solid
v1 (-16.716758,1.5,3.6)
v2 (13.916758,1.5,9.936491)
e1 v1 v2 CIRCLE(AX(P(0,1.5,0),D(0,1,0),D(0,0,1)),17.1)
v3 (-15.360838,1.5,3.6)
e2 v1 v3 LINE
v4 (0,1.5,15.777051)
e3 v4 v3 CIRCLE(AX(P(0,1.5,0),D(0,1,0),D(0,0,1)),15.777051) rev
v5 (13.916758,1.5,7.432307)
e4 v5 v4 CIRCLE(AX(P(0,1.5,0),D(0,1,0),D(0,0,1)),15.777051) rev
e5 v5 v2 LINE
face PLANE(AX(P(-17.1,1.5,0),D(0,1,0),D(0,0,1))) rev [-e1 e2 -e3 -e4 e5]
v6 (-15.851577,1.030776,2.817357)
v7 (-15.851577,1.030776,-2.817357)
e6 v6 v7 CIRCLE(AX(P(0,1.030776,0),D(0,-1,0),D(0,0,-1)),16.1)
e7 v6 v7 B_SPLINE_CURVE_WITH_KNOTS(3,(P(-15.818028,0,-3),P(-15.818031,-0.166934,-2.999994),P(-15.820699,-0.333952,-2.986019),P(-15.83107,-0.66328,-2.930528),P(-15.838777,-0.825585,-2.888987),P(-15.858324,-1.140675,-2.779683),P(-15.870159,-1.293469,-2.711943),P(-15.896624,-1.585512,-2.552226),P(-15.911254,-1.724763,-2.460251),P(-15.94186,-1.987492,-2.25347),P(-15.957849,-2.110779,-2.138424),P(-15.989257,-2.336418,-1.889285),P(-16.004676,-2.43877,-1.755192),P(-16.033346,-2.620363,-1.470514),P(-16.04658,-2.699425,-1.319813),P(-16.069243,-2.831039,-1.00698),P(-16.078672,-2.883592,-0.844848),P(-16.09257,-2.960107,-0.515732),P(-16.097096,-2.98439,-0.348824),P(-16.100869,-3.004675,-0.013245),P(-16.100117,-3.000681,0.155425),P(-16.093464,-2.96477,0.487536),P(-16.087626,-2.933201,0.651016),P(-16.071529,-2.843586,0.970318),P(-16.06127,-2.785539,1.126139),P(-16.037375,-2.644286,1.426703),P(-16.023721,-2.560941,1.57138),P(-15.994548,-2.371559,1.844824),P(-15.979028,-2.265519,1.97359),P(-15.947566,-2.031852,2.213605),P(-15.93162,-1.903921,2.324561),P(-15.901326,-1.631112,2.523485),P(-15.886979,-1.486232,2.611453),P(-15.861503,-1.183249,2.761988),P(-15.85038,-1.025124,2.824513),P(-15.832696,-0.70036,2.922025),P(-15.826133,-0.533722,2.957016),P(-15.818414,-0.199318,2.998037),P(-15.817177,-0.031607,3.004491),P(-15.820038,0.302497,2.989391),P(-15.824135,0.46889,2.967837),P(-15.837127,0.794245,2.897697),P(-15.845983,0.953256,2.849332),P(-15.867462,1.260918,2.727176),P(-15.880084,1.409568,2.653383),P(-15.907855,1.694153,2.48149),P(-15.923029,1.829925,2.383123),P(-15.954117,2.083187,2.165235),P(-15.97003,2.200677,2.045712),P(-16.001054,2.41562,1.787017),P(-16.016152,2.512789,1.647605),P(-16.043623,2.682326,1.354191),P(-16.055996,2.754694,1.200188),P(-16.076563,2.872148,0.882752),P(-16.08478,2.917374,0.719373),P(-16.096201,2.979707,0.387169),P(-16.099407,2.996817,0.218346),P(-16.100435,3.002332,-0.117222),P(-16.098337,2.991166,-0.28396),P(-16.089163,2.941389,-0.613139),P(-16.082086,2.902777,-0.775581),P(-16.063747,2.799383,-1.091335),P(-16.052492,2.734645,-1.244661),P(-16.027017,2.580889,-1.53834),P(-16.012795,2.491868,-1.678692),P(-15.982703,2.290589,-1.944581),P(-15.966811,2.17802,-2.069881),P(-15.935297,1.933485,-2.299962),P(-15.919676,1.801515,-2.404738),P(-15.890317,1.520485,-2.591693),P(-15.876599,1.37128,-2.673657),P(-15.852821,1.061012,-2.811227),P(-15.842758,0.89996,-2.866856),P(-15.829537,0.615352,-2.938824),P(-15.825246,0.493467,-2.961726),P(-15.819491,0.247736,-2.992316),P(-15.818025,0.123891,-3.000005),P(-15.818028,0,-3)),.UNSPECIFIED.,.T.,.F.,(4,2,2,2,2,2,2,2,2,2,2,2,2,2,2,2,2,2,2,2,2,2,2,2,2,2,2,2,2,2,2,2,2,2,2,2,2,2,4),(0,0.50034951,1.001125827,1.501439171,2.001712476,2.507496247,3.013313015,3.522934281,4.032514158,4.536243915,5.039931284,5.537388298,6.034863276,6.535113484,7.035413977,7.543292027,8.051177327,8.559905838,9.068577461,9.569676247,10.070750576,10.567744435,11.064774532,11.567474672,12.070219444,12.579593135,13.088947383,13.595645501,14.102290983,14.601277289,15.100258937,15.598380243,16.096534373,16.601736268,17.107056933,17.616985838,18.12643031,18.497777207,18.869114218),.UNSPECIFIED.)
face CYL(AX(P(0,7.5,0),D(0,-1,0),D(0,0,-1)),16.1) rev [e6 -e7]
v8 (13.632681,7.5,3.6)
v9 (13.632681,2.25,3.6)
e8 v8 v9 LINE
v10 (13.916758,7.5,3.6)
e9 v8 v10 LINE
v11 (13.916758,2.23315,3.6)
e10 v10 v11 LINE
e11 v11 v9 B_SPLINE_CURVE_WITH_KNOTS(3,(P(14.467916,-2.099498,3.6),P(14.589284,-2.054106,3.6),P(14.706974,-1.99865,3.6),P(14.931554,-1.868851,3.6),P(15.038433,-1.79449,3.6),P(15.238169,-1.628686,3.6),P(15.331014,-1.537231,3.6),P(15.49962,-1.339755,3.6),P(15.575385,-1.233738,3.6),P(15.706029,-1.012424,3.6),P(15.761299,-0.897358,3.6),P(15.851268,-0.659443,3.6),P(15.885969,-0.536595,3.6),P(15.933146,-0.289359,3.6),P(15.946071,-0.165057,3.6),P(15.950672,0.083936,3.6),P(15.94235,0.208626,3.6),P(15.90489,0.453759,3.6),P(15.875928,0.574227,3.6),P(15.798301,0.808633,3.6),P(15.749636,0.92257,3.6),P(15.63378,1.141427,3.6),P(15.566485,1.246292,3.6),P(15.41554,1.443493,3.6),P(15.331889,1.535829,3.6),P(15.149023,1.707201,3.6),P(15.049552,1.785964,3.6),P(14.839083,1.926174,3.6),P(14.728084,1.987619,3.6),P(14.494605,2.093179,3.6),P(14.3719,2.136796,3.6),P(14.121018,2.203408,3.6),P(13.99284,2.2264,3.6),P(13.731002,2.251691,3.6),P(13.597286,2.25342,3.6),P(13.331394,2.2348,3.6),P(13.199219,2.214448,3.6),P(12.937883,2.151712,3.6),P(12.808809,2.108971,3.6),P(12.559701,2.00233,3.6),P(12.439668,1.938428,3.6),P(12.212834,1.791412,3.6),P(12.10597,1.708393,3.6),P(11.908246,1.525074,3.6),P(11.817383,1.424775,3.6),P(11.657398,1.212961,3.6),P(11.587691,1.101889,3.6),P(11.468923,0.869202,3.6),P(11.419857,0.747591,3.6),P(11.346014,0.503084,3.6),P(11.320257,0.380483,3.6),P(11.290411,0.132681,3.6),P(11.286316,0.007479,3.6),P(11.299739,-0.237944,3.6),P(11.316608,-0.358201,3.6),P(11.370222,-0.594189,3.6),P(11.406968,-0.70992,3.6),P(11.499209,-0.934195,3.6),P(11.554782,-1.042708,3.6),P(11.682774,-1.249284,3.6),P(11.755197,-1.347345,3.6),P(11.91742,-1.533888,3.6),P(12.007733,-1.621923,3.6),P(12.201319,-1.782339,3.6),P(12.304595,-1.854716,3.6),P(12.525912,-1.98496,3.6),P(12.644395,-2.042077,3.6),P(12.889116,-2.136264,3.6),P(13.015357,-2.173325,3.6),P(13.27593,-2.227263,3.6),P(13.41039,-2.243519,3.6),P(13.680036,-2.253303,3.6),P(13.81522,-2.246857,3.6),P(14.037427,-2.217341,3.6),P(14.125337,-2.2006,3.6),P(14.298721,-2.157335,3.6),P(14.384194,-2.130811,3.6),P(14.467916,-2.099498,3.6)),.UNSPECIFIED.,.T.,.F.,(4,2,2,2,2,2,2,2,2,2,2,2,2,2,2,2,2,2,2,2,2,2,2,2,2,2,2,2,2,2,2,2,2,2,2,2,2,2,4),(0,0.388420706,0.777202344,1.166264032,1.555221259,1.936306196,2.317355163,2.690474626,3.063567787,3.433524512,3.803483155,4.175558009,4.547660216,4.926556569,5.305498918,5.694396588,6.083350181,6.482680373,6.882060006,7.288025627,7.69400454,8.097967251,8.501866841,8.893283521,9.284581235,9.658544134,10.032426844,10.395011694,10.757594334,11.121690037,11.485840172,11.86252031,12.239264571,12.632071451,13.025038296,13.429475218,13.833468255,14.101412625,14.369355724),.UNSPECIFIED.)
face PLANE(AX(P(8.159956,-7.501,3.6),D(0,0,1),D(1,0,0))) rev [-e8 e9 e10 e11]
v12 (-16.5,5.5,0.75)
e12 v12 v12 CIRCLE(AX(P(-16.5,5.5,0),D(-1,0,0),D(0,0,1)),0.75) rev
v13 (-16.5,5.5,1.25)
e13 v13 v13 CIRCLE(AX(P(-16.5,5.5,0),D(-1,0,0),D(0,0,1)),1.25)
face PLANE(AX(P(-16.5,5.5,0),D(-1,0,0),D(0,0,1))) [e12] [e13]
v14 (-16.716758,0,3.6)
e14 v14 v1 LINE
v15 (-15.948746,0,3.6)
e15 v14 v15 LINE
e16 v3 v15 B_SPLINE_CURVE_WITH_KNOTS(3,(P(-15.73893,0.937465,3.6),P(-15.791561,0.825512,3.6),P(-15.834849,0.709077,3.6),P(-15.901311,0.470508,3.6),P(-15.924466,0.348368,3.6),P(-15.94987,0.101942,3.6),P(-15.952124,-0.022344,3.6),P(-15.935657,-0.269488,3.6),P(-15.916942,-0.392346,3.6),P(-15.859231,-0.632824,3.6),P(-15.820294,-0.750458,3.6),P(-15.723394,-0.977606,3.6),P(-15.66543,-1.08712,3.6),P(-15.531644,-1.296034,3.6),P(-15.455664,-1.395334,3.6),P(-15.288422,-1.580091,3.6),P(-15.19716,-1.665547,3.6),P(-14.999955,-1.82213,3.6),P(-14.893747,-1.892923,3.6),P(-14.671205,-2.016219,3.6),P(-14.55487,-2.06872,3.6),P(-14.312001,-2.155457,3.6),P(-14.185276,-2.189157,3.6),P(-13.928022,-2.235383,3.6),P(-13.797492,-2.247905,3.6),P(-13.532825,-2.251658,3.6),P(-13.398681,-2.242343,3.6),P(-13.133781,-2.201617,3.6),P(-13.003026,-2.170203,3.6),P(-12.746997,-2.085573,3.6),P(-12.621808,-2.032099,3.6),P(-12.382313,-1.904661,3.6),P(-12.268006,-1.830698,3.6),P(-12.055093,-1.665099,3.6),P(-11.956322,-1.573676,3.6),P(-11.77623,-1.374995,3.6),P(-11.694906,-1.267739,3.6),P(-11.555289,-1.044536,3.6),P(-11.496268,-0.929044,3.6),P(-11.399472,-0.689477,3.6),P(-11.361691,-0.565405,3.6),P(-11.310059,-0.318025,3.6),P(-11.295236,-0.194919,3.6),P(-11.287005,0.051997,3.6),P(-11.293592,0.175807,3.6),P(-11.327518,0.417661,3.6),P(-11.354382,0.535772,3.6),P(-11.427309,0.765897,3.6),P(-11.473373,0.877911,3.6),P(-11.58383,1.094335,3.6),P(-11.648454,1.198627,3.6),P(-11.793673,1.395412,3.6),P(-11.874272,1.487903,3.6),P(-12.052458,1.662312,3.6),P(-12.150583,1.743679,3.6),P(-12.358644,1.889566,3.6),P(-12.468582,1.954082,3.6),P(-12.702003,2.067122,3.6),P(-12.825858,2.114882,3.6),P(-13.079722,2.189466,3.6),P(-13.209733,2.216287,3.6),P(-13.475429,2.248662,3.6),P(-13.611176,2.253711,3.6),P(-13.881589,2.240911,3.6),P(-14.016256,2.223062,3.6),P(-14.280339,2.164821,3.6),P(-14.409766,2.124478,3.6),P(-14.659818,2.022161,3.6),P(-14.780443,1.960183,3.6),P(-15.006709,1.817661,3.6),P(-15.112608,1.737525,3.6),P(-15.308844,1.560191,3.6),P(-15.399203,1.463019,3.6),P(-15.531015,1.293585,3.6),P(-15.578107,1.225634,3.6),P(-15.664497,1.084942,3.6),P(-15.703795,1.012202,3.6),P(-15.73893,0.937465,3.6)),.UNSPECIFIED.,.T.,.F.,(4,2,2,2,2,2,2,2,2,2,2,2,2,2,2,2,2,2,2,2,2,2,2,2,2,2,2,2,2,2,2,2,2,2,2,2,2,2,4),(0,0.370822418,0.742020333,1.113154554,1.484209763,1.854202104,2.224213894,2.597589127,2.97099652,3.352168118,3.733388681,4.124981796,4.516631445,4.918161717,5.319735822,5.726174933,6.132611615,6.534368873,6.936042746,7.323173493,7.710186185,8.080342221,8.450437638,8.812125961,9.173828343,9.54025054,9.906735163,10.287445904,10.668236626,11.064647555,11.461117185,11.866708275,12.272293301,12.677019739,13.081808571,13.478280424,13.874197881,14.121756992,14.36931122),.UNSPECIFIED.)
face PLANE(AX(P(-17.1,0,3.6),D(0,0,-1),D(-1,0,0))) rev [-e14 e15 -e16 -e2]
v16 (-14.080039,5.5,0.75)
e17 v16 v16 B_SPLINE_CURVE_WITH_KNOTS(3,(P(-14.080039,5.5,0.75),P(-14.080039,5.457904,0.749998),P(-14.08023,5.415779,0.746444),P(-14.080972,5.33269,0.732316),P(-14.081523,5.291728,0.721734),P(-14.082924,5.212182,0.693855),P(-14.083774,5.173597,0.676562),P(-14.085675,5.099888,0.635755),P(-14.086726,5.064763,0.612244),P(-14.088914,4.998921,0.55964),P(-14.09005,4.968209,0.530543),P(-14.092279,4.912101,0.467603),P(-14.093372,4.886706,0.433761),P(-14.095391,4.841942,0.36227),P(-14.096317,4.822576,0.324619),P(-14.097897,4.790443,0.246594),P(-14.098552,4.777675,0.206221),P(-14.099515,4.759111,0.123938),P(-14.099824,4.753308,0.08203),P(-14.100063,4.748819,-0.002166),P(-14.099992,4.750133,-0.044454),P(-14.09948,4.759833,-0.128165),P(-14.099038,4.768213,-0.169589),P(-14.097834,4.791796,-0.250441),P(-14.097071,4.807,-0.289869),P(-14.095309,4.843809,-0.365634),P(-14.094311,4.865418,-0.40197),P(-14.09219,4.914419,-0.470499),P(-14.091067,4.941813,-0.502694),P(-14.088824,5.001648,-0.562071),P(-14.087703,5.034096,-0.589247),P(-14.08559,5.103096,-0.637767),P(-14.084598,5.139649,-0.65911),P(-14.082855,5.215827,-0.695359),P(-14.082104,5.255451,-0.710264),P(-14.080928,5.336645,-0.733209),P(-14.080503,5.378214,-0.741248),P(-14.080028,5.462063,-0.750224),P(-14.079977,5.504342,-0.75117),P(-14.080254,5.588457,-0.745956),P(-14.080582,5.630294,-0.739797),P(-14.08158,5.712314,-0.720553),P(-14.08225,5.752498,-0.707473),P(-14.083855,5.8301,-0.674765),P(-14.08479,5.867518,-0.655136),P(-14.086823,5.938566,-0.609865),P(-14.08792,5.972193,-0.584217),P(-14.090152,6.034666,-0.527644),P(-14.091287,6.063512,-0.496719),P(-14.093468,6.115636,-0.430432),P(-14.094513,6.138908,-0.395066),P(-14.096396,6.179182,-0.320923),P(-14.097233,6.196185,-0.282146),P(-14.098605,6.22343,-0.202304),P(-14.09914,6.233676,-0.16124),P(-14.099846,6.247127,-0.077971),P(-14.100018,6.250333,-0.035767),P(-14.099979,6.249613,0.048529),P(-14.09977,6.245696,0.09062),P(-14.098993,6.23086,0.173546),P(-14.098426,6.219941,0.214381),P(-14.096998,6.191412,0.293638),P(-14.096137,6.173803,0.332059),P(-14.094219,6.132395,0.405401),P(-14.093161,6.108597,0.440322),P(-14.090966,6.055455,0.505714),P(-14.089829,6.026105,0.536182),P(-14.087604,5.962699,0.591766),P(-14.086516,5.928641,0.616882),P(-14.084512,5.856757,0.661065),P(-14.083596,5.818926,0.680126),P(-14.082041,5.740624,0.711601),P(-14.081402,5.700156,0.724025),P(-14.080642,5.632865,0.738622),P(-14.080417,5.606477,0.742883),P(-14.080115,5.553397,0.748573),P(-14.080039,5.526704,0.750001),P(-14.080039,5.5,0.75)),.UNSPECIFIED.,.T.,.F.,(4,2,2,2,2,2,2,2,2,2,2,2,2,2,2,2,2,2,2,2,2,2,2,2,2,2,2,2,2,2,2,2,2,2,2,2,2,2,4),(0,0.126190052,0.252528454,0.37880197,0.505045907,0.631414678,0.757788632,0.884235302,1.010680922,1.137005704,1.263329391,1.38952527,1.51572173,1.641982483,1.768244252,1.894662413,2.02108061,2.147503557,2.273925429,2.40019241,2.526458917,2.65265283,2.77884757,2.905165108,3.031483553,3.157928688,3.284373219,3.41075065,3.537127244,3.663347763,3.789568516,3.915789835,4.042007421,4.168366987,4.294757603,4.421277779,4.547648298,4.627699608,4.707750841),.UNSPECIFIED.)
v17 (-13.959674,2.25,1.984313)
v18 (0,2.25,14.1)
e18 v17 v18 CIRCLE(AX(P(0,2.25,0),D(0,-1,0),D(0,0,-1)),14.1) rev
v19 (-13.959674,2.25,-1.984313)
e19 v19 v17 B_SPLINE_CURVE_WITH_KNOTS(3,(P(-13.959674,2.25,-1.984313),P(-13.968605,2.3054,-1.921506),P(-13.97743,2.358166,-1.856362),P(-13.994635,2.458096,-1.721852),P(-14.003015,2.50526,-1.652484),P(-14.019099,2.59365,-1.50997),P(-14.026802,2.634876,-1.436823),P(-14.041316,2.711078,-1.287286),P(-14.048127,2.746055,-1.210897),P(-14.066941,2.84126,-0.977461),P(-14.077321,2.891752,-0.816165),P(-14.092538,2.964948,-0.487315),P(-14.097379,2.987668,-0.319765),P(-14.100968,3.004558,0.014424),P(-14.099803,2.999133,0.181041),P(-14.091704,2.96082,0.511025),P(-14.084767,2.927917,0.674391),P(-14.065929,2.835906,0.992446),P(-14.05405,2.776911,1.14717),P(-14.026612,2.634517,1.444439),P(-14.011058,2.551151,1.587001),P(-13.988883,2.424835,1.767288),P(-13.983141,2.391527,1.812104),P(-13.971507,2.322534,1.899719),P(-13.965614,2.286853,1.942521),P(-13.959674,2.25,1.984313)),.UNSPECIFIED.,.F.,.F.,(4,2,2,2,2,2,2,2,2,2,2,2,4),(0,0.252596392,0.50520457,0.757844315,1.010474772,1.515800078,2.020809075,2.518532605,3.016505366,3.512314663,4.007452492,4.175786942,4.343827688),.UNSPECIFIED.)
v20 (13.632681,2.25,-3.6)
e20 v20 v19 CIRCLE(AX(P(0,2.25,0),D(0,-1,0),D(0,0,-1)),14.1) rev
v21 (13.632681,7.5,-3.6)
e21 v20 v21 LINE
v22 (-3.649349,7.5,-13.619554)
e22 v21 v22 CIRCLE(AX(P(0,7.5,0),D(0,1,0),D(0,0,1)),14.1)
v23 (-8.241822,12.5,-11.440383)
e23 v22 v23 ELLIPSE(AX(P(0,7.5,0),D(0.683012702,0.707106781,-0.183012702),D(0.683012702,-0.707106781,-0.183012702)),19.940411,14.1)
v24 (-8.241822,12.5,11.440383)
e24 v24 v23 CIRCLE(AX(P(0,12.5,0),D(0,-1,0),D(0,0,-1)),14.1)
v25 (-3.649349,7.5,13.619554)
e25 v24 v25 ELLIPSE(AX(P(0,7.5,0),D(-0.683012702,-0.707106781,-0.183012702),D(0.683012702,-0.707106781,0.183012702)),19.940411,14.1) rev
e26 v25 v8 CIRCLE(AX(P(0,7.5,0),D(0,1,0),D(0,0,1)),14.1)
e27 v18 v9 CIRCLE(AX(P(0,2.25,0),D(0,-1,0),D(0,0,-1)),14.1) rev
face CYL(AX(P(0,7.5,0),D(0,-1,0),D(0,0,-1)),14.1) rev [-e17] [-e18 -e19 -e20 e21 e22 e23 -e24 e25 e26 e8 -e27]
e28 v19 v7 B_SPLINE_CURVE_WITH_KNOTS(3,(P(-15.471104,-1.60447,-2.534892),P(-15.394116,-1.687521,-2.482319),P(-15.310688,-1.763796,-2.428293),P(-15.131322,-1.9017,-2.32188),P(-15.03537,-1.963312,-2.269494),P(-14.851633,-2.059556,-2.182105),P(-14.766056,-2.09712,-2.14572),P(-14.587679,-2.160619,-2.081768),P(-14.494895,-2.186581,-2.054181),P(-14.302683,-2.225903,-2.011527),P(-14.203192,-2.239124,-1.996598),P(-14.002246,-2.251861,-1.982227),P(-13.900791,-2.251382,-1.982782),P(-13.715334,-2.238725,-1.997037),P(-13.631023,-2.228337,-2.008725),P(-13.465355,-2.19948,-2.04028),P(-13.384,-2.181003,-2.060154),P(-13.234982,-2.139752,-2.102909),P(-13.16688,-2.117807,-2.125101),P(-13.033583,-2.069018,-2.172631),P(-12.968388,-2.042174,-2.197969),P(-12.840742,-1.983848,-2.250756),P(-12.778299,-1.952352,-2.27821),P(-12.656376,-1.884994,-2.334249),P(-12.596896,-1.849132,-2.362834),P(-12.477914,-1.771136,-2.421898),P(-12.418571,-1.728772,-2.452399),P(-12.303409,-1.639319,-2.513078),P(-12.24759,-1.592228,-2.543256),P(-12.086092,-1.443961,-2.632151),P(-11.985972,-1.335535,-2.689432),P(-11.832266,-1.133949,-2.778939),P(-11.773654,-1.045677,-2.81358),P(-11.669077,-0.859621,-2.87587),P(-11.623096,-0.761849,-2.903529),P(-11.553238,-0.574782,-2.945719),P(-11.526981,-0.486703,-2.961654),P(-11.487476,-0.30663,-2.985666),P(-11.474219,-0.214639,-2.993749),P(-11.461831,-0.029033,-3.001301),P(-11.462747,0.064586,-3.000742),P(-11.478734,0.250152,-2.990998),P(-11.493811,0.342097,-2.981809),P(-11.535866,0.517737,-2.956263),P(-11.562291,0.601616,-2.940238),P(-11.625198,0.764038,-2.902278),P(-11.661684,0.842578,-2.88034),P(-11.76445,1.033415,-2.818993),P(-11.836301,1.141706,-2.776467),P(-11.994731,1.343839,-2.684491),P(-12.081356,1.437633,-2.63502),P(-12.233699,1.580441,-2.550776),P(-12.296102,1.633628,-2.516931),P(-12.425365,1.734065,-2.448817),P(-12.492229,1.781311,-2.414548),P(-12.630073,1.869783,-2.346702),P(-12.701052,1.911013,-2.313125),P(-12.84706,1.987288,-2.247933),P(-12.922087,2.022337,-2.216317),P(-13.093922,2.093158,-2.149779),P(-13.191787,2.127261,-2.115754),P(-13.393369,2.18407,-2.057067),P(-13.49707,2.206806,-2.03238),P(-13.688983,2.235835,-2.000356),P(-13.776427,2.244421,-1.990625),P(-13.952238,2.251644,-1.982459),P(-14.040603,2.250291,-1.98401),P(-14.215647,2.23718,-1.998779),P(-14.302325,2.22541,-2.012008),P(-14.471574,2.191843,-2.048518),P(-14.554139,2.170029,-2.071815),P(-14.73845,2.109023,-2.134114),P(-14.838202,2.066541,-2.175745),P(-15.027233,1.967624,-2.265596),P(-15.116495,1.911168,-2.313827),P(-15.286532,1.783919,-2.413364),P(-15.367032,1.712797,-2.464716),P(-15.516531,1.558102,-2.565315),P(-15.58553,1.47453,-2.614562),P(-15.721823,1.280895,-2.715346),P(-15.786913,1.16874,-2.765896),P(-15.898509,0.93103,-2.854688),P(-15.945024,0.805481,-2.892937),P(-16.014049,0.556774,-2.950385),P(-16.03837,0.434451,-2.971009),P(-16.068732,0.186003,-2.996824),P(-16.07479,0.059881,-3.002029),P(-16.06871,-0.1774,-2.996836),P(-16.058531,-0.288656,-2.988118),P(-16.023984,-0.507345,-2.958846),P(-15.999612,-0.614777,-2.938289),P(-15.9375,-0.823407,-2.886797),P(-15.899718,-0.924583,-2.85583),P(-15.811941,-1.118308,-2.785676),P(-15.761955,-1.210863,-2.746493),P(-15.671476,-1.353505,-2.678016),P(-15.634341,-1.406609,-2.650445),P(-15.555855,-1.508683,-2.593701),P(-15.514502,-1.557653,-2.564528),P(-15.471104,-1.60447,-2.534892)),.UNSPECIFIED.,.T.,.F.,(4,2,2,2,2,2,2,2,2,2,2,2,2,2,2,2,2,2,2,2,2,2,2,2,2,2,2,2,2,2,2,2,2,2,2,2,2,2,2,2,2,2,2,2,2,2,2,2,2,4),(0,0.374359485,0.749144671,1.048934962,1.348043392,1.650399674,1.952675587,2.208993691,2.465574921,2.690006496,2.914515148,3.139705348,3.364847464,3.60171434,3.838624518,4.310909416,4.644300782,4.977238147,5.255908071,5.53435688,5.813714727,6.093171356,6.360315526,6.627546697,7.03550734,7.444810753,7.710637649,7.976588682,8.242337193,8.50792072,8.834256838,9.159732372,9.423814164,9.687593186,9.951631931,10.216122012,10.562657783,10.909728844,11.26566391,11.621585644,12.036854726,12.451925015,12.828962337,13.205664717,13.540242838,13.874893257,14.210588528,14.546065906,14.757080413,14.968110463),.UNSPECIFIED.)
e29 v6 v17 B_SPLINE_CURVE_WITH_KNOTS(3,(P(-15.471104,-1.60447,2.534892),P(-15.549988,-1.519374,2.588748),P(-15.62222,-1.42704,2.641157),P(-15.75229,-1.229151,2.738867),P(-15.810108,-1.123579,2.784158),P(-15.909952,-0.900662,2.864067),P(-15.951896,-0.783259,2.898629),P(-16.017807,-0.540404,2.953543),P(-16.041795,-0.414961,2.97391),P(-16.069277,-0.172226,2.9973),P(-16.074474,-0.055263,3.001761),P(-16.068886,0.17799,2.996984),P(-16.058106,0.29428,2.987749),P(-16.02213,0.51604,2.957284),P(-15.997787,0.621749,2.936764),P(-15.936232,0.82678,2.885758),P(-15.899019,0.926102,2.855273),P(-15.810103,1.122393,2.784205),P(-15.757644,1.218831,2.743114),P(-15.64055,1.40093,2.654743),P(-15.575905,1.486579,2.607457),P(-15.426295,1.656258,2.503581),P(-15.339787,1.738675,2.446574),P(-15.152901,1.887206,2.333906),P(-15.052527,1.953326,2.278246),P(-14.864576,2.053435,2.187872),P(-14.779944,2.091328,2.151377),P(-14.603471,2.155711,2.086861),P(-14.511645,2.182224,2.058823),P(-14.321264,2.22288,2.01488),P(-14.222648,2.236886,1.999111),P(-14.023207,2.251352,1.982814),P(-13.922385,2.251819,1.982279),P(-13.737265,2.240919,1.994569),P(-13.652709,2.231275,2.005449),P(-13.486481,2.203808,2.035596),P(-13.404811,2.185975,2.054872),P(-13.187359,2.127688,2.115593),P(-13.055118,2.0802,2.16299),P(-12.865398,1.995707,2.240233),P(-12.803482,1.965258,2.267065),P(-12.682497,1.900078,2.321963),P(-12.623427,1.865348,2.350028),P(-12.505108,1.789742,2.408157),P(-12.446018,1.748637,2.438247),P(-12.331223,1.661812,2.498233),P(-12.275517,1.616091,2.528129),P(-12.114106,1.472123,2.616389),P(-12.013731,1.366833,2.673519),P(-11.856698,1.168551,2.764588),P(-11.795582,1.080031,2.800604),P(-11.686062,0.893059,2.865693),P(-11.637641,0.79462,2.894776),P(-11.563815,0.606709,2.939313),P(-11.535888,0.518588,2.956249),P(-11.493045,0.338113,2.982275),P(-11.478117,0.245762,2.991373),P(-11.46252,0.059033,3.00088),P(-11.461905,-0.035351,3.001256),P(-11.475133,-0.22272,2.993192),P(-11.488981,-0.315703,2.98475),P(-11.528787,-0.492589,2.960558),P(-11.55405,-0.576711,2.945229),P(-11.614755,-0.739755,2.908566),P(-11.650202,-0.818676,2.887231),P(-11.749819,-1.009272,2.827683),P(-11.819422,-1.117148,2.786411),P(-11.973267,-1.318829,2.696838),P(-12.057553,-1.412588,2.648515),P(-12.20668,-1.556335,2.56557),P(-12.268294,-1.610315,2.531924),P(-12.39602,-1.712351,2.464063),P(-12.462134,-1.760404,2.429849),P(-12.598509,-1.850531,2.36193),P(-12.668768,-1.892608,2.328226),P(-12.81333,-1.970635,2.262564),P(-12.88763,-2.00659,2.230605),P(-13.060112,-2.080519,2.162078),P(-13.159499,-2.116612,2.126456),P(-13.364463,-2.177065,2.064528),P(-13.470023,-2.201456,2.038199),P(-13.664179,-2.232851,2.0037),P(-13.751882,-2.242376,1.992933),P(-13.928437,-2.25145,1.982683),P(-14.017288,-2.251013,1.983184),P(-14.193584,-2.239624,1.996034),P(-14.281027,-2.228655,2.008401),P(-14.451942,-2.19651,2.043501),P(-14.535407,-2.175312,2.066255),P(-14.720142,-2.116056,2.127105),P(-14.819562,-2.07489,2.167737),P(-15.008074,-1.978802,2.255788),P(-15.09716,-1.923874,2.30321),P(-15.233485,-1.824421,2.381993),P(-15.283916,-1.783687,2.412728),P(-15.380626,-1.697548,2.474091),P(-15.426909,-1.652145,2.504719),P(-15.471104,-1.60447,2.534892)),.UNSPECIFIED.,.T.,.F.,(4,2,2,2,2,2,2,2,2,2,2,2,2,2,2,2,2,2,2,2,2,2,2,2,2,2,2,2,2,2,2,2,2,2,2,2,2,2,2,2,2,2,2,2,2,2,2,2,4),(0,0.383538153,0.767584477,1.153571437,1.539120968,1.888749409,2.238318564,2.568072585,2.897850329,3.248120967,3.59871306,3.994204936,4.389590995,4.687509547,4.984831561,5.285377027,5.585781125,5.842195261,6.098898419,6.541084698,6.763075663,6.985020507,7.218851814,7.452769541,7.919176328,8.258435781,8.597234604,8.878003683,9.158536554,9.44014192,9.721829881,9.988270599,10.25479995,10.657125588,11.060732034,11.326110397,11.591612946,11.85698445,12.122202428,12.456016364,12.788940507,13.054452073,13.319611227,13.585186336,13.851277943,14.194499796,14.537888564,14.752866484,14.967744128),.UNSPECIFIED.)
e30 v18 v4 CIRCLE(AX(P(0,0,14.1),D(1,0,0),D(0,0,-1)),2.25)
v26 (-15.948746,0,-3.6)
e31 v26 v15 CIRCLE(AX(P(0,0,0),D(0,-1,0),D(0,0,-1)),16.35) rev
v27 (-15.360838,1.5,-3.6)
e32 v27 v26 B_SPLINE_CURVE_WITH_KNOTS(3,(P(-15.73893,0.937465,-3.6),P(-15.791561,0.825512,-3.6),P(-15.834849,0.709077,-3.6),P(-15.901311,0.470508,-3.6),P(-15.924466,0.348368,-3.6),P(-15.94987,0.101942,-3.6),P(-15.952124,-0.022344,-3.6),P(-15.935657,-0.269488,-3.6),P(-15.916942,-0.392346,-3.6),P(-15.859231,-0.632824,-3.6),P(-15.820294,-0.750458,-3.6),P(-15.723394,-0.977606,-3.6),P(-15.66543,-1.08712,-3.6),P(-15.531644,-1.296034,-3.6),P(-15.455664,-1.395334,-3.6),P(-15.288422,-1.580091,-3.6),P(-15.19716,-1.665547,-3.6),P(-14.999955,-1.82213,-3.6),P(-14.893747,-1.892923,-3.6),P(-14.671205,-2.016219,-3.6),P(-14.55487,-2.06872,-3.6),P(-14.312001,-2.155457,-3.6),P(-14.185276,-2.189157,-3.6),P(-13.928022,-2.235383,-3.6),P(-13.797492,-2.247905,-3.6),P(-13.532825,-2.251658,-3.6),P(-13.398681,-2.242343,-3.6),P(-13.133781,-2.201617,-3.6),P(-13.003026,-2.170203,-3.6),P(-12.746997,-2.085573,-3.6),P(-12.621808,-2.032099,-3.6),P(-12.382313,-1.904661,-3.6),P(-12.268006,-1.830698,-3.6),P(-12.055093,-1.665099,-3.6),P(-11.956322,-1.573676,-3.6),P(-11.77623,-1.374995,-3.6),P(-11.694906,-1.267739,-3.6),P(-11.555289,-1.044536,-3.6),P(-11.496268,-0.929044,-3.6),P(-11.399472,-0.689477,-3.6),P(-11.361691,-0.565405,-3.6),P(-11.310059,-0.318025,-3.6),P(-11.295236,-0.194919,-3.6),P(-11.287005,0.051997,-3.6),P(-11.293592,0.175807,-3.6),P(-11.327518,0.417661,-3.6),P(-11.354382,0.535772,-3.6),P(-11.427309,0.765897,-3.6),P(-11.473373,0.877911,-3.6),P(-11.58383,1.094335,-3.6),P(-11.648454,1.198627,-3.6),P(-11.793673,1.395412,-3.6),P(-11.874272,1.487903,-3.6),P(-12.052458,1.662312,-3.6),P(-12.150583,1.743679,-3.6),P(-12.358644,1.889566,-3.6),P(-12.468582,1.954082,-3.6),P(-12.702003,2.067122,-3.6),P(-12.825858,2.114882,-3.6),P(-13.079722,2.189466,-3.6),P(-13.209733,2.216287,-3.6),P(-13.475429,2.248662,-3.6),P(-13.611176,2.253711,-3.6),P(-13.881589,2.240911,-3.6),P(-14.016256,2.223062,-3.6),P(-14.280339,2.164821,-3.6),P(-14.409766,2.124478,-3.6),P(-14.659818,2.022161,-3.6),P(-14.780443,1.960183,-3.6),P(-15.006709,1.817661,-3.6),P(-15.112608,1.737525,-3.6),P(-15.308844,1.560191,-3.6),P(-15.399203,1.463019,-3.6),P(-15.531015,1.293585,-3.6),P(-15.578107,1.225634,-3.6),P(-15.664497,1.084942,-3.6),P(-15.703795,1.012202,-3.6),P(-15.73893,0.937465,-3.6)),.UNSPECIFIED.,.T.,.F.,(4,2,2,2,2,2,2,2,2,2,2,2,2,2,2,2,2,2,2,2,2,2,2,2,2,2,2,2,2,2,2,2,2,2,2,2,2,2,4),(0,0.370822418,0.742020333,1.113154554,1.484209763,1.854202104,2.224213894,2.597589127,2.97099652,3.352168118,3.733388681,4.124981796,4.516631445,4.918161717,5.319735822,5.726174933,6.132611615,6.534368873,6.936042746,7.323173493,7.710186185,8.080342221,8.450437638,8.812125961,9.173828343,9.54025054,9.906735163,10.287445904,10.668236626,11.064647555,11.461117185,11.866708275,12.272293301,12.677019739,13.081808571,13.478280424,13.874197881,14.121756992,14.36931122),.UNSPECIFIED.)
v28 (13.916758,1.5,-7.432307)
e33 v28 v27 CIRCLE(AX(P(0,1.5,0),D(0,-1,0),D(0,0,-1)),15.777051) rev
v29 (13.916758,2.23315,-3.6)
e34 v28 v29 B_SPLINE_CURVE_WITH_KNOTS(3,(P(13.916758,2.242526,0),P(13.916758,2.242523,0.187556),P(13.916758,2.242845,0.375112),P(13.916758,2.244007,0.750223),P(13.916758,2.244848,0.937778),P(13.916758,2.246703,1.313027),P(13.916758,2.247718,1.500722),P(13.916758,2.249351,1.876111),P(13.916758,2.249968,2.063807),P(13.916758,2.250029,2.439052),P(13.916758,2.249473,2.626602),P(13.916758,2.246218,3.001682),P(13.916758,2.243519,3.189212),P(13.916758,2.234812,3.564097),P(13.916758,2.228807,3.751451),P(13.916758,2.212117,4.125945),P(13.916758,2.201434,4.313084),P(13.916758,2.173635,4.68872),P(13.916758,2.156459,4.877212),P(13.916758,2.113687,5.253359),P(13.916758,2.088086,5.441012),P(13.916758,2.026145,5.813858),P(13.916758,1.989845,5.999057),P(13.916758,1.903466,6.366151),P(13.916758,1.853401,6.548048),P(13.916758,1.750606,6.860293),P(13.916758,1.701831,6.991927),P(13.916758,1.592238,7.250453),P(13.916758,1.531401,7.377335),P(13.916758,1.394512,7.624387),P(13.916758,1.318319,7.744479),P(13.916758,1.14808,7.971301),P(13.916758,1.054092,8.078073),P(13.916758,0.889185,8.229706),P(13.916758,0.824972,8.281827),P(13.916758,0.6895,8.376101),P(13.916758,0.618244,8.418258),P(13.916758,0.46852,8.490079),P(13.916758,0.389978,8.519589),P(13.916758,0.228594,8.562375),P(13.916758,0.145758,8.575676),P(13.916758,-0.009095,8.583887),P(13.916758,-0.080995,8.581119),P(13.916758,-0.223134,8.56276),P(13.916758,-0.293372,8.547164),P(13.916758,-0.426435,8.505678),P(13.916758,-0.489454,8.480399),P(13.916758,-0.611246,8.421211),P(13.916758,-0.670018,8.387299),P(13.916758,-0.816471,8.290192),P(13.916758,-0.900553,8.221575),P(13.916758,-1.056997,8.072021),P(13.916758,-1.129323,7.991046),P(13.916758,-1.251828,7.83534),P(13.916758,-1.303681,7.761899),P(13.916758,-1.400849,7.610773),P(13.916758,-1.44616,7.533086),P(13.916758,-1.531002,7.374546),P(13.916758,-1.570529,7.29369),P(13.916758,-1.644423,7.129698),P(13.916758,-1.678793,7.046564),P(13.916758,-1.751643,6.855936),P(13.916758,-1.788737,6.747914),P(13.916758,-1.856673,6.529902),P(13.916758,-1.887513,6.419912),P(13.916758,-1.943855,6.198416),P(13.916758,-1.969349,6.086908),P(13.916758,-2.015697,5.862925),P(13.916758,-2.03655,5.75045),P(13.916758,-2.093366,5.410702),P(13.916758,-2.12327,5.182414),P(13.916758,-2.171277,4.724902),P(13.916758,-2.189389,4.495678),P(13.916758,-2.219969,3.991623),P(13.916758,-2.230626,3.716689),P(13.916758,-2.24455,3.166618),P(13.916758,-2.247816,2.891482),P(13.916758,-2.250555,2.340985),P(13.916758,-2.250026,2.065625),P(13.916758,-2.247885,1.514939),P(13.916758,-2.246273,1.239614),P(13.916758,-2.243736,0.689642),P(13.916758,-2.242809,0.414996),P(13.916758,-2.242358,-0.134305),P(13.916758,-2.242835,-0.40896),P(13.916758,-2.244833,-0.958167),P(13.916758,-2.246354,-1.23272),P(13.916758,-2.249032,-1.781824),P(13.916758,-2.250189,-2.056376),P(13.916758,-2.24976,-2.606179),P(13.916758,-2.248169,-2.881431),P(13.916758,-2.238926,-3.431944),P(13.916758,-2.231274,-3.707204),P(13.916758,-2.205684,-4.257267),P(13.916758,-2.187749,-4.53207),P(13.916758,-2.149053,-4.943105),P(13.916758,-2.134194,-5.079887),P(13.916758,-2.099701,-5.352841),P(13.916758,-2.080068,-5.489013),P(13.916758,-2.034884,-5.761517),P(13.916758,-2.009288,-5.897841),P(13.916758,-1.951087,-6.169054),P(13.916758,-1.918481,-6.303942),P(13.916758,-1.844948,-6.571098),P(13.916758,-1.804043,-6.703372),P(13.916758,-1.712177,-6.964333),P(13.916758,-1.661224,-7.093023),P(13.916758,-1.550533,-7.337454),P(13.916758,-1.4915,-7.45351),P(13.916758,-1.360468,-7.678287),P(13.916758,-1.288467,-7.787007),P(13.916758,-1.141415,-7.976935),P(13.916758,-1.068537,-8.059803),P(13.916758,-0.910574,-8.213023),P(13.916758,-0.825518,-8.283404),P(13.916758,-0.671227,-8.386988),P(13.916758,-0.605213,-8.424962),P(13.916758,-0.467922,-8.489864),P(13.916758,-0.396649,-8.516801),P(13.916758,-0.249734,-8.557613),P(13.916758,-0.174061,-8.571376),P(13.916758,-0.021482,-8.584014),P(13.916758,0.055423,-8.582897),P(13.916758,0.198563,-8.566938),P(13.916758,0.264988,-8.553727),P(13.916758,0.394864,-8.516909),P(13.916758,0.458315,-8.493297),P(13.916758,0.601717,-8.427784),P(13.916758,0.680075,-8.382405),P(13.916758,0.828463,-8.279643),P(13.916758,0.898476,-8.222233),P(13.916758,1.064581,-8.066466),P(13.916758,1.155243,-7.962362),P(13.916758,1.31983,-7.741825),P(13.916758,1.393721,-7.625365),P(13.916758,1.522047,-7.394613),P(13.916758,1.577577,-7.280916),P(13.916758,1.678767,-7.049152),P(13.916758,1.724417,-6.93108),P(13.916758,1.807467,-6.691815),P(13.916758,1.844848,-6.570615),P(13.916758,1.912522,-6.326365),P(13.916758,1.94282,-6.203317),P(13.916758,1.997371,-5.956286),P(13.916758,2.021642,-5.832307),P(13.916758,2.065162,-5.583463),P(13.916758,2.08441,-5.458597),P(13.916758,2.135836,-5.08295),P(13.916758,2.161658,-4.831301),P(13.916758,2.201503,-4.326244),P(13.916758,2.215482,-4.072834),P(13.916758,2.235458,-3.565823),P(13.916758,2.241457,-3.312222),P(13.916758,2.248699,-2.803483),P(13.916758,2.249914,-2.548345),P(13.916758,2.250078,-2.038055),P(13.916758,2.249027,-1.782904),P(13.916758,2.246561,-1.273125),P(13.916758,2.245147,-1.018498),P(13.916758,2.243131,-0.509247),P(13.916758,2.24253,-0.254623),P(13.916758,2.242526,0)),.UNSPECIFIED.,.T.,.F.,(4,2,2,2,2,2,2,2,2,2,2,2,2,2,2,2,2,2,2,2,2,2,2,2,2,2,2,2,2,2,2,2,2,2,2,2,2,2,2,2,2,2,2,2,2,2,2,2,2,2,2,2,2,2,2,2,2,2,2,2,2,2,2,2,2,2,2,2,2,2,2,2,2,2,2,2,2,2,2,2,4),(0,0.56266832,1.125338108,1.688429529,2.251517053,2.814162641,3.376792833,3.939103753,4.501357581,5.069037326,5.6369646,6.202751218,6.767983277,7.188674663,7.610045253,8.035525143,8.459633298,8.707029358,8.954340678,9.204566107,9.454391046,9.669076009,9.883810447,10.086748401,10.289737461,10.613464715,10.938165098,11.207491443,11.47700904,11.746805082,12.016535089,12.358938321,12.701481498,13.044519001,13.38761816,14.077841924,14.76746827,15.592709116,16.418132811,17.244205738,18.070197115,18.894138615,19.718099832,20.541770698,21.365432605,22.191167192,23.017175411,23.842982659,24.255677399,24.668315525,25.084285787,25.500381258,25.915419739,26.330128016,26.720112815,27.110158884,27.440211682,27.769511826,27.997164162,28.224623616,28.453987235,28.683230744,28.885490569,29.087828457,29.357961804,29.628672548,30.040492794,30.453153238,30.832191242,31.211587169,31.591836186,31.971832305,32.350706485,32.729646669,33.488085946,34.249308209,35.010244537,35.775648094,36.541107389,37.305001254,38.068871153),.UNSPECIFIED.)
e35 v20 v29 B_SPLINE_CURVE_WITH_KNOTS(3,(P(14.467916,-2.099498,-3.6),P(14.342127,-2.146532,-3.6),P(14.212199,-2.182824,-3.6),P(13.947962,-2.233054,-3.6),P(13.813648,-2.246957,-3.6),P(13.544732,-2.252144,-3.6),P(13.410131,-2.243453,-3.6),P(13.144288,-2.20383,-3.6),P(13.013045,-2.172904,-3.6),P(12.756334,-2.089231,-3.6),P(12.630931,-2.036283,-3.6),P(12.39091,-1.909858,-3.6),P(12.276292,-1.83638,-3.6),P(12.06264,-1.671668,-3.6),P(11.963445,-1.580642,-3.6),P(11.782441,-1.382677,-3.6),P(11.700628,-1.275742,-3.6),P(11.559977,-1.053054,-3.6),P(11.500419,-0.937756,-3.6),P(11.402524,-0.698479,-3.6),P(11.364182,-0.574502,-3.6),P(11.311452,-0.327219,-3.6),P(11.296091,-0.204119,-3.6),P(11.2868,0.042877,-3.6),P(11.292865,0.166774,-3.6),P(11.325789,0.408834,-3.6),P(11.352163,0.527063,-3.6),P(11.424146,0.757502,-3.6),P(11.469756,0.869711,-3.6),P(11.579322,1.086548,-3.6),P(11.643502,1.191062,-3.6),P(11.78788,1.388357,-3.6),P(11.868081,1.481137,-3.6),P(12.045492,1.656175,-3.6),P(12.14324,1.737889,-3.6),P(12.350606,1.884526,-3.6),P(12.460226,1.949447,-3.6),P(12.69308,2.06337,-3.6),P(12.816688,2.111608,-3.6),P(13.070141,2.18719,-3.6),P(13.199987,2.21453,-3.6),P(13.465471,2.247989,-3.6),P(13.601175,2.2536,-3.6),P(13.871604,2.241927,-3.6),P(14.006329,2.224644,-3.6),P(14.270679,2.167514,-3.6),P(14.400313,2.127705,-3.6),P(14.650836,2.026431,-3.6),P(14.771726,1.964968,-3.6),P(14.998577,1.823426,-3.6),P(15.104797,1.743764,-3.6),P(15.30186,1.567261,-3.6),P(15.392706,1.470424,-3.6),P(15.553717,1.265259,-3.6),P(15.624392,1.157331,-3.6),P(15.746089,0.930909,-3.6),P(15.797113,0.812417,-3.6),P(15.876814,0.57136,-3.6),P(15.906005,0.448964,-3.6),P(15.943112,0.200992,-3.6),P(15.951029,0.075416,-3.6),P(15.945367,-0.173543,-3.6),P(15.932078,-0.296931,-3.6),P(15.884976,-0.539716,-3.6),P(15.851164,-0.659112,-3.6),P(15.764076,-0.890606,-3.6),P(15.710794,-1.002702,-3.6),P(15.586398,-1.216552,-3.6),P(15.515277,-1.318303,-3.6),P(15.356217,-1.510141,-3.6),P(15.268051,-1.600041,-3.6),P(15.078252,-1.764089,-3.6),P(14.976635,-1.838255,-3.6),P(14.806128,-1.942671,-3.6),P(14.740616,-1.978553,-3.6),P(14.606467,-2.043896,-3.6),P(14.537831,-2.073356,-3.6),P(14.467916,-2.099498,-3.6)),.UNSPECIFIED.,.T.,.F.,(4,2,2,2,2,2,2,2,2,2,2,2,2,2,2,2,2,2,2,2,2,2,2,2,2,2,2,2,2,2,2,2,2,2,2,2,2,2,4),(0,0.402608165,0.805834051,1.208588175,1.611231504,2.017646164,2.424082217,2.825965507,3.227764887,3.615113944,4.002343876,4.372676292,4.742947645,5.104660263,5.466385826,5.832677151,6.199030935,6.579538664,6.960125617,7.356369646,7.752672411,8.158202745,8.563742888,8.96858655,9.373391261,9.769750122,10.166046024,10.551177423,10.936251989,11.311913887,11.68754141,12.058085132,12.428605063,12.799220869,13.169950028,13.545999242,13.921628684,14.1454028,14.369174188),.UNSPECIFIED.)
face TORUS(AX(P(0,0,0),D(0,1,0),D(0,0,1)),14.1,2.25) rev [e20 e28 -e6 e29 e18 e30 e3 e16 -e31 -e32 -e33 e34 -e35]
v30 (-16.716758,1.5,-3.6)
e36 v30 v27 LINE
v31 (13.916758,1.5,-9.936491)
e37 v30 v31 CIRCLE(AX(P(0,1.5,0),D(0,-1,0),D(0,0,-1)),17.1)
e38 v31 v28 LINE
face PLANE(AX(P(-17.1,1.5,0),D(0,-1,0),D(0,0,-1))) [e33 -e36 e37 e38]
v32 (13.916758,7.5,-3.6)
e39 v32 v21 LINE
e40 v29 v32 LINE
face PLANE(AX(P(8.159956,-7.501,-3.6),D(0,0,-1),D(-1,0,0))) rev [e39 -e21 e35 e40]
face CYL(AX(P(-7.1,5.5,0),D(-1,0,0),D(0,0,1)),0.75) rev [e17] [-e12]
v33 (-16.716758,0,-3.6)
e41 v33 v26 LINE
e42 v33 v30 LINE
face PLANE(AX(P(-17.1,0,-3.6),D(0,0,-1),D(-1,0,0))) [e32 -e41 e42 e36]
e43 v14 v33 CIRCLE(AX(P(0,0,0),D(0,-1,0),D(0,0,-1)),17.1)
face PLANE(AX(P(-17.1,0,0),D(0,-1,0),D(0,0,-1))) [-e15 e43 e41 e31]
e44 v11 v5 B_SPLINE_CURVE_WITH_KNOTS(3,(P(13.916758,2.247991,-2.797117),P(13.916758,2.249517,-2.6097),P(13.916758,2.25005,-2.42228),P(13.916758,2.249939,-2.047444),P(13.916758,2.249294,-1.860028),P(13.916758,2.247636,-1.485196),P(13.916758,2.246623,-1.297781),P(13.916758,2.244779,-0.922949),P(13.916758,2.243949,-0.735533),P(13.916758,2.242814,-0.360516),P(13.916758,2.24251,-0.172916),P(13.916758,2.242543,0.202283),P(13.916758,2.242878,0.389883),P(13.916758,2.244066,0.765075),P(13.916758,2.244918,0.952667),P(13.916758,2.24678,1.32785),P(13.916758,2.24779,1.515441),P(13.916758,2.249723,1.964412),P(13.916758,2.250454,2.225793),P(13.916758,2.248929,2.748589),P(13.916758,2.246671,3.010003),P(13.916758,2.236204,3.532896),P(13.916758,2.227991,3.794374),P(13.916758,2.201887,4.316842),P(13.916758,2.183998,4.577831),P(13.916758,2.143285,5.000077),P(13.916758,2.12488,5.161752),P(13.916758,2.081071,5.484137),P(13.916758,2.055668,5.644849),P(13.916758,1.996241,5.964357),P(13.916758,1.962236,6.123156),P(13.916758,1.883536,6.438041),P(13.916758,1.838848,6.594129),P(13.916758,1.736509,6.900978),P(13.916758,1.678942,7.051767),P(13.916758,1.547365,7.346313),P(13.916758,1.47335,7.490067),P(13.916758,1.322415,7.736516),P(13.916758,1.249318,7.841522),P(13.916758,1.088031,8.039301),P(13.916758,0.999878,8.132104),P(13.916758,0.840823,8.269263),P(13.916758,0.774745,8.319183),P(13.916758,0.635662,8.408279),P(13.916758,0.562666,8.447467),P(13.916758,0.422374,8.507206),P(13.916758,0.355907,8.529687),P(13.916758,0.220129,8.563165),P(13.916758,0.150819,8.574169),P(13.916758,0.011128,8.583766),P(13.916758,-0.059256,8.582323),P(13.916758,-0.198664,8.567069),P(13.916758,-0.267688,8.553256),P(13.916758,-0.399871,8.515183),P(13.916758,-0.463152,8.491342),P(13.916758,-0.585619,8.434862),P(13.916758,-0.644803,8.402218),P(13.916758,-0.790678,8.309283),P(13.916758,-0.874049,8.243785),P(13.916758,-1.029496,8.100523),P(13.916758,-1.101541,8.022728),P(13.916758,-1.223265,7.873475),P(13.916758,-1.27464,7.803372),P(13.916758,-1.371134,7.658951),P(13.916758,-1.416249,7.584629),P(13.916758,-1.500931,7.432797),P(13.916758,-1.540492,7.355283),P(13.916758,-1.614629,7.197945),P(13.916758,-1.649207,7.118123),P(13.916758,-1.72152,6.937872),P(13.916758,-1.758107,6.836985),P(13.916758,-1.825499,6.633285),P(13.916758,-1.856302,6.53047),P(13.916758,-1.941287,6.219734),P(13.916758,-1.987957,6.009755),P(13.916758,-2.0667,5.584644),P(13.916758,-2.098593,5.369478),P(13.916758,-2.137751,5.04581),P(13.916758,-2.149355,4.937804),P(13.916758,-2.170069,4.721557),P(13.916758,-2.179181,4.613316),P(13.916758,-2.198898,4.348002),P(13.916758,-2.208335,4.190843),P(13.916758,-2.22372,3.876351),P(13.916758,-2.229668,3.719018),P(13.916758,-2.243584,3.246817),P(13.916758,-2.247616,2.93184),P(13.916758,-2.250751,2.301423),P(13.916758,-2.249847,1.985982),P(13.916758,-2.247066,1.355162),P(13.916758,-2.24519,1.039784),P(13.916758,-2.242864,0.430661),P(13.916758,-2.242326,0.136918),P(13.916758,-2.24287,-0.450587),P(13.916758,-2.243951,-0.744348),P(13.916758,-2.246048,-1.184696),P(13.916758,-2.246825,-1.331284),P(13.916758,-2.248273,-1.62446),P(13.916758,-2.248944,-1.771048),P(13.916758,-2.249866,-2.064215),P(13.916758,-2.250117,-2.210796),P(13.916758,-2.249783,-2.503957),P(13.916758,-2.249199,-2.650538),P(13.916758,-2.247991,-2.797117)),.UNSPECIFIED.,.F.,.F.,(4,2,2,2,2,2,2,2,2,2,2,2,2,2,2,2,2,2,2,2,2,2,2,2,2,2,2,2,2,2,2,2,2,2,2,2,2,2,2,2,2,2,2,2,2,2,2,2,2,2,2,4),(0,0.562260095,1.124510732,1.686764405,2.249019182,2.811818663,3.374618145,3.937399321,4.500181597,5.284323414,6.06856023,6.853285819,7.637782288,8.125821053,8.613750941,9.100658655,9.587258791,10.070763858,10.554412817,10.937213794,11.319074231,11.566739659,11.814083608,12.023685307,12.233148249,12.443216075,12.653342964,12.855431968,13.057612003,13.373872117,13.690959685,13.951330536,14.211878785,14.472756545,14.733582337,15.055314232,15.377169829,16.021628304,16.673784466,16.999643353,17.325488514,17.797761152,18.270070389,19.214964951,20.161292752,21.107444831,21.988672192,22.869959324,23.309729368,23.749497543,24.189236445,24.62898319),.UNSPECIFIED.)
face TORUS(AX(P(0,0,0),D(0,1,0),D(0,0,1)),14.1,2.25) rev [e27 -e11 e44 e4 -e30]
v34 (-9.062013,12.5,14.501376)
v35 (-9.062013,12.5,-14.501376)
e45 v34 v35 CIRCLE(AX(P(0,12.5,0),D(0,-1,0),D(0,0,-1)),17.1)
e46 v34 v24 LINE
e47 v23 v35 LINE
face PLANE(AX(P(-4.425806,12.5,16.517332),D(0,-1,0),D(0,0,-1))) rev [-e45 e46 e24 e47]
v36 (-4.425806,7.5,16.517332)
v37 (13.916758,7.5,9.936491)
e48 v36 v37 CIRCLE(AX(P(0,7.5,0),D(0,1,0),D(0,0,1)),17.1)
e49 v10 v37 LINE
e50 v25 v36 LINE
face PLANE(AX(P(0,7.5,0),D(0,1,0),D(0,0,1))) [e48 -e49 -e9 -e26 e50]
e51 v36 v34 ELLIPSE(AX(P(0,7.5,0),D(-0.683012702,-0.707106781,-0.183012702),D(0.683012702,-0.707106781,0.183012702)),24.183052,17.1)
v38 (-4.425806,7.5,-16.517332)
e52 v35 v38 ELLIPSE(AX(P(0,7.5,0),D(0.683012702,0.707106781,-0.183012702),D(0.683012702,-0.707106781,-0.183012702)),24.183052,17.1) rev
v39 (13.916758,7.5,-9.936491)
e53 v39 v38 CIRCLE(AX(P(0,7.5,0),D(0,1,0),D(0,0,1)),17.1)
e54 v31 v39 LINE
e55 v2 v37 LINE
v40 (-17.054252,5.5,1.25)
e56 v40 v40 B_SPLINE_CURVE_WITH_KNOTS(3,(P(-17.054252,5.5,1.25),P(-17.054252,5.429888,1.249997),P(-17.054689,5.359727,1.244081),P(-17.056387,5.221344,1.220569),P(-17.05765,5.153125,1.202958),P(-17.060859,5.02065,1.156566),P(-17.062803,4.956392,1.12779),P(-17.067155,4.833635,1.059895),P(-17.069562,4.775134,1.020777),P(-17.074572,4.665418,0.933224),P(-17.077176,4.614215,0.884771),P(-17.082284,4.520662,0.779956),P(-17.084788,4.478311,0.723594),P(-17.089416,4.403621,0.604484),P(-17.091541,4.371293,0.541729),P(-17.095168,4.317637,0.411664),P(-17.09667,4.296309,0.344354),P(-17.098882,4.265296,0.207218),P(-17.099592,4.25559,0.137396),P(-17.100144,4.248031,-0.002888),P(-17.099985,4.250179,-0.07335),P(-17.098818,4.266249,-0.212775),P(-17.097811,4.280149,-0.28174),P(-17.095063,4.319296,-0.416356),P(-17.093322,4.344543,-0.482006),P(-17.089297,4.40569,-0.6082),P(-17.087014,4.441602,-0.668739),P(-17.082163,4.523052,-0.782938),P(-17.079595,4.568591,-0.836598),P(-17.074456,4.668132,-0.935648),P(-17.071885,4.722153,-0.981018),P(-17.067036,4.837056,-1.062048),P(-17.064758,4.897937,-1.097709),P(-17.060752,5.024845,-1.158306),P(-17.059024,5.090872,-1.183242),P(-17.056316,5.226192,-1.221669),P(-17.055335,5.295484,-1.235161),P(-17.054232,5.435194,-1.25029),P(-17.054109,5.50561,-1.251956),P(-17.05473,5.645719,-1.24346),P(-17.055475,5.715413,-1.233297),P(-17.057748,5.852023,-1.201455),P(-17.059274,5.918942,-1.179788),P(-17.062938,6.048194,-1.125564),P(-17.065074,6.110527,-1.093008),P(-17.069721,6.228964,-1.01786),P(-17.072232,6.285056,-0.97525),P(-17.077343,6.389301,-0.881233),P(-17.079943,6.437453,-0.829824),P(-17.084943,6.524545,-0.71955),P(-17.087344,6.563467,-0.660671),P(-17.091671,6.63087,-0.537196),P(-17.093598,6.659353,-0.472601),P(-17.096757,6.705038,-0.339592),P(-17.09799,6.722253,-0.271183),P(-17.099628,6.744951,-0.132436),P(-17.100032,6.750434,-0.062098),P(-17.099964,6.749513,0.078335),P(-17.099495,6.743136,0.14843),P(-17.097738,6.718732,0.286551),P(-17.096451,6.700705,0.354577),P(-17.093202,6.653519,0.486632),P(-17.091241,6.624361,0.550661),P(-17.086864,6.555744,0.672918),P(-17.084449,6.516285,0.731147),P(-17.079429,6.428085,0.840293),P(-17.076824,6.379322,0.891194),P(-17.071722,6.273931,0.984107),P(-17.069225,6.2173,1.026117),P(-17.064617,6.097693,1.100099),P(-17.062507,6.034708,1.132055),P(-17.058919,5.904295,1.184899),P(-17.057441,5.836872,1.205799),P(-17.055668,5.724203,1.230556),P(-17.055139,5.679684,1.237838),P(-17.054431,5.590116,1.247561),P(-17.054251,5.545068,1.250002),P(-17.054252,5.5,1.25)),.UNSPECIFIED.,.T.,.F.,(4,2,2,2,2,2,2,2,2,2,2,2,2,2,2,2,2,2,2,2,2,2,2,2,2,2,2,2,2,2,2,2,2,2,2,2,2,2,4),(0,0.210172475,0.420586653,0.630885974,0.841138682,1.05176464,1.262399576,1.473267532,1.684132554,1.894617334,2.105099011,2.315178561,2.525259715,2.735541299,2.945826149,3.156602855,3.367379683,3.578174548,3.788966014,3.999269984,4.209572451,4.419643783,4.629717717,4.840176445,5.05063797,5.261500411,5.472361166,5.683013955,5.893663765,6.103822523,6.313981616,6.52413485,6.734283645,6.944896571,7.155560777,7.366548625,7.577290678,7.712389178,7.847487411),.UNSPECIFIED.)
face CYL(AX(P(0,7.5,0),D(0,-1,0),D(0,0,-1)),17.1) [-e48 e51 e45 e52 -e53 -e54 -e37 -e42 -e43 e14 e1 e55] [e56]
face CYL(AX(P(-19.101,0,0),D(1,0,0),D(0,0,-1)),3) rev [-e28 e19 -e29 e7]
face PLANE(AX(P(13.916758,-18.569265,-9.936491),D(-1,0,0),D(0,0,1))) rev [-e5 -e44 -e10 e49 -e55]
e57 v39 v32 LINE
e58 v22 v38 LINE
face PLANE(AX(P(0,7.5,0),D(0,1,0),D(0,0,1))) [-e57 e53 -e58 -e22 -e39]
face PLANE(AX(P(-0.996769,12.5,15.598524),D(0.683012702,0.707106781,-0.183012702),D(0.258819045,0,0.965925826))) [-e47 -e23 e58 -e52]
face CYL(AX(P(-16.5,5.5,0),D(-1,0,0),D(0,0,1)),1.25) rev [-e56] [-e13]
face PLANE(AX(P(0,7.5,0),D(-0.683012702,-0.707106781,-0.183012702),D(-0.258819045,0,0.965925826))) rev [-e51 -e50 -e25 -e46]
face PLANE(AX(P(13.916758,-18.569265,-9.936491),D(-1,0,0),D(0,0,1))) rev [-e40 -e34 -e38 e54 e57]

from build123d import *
from build123d.topology import SkipClean

# Parameters (mm, degrees)
CROQUIS1_R                 = 17.1
CROQUIS1_R_2               = 14.1
SALIENTE_EXTRUIR1_DEPTH    = 7.5
CORTAR_EXTRUIR1_REACH      = 30.457
CROQUIS2_W                 = 15.420651877
CROQUIS2_H                 = 7.2
CROQUIS54_W                = 3
CROQUIS54_H                = 25
REVOLUCI_N1_ANGLE          = 150
CORTAR_BARRER2_PROFILE_R   = 2.25
CHAFL_N3_SIZE              = 5
CORTAR_EXTRUIR2_REACH      = 29.223
CORTAR_EXTRUIR2_END_RADIUS = 16.1
CROQUIS61_R                = 3
CORTAR_EXTRUIR3_START      = -17.1
CORTAR_EXTRUIR3_DEPTH      = 33.816758059
CROQUIS63_R                = 0.75
CORTAR_EXTRUIR4_DEPTH      = 10
CROQUIS64_R                = 1.25
CORTAR_EXTRUIR5_DEPTH      = 0.6
CORTAR_EXTRUIR6_START      = -6
CROQUIS65_W                = 2.8
CROQUIS65_H                = 19.872981168
CORTAR_EXTRUIR6_DEPTH      = 11


# Read off the part's stored shape, not the designer's step: Cortar-Extruir3
with BuildPart() as part:
    # Croquis1 → Saliente-Extruir1 (new, symmetric)
    with BuildSketch(Plane(origin=(0, 0, 0), x_dir=(1, 0, 0), z_dir=(0, 1, 0))):
        with Locations(Location((0, 0, 0), (0, 0, 270))):
            Circle(CROQUIS1_R)
        with Locations(Location((0, 0, 0), (0, 0, 270))):
            Circle(CROQUIS1_R_2, mode=Mode.SUBTRACT)
    extrude(amount=SALIENTE_EXTRUIR1_DEPTH, both=True)

    # Croquis2 → Cortar-Extruir1 (cut, up to next)
    with BuildSketch(Plane(origin=(0, 7.5, 0), x_dir=(1, 0, 0), z_dir=(0, 1, 0)), mode=Mode.PRIVATE) as cortar_extruir1_sk1:
        with Locations((15.870282115, 0)):
            Rectangle(CROQUIS2_W, CROQUIS2_H)
    cortar_extruir1_tool1 = extrude(cortar_extruir1_sk1.sketch, amount=-CORTAR_EXTRUIR1_REACH, mode=Mode.PRIVATE) & part.part
    add(cortar_extruir1_tool1.solids().sort_by_distance((15.870282, 7.5, 0))[0], mode=Mode.SUBTRACT)

    # Croquis54 → Revolución1 (revolve, symmetric)
    with SkipClean():  # the faces are left unmerged after this step: merging them gives an invalid solid
        with BuildSketch(Plane.XY) as revoluci_n1_sk:
            with Locations((-15.6, 0)):
                Rectangle(CROQUIS54_W, CROQUIS54_H)
        revolve(axis=Axis((0, -13.582020258, 0), (0, 1, 0)), revolution_arc=REVOLUCI_N1_ANGLE / 2)
        revolve(revoluci_n1_sk.sketch, axis=Axis((0, -13.582020258, 0), (0, -1, 0)), revolution_arc=REVOLUCI_N1_ANGLE / 2)
    add(part.part.scale(1), mode=Mode.REPLACE)  # the faces are merged on a copy

    # Cortar-Barrer2: sweep along a path in Croquis12
    with BuildLine(Plane(origin=(0, 0, 0), x_dir=(1, 0, 0), z_dir=(0, 1, 0))) as cortar_barrer2_path:
        CenterArc((0, 0), 14.1, 0, 360)
    # Cortar-Barrer2 profile (on start of the path) → Cortar-Barrer2 (sweep, cut)
    with BuildSketch(Plane(origin=(14.1, 0, 0), x_dir=(-1, 0, 0), z_dir=(0, 0, -1))):
        Circle(CORTAR_BARRER2_PROFILE_R)
    sweep(path=cortar_barrer2_path.line, mode=Mode.SUBTRACT)

    # Chaflán3
    chafl_n3_edges = [part.edges().sort_by_distance(p)[0] for p in [
        (-4.037577104, -12.5, -15.06844289),
        (-4.037577104, 12.5, -15.06844289),
        (-4.037577104, -12.5, 15.06844289),
        (-4.037577104, 12.5, 15.06844289),
    ]]
    chamfer(chafl_n3_edges, length=CHAFL_N3_SIZE - 0.0001)  # a hair under: the kernel refuses the full size

    # Cortar-Extruir2: up to this cylinder (the profile starts inside it)
    cortar_extruir2_end = Plane(origin=(0, 0, 0), z_dir=(0, -1, 0)) * Cylinder(CORTAR_EXTRUIR2_END_RADIUS, 91.646, mode=Mode.PRIVATE)
    # Croquis61 → Cortar-Extruir2 (cut, up to the surface)
    with BuildSketch(Plane(origin=(0, 0, 0), x_dir=(0, 0, -1), z_dir=(1, 0, 0)), mode=Mode.PRIVATE) as cortar_extruir2_sk1:
        Circle(CROQUIS61_R)
    cortar_extruir2_tool1 = extrude(cortar_extruir2_sk1.sketch, amount=-CORTAR_EXTRUIR2_REACH, mode=Mode.PRIVATE) & cortar_extruir2_end
    add(cortar_extruir2_tool1.solids().sort_by_distance((0, 0, 0))[0], mode=Mode.SUBTRACT)

    # Cortar-Extruir3 outline → Cortar-Extruir3 (cut)
    with BuildSketch(Plane(origin=(0, 0, 0), x_dir=(0, 0, -1), z_dir=(1, 0, 0)).offset(CORTAR_EXTRUIR3_START)):
        Polygon((3.6, 0), (-3.6, 0), (-3.6, 1.5), (-20.692074401, 1.5), (-20.692074401, -12.752391624), (19.353781031, -12.752391624), (19.353781031, 1.5), (3.6, 1.5), align=None)
    extrude(amount=CORTAR_EXTRUIR3_DEPTH, mode=Mode.SUBTRACT)

    # Croquis63 → Cortar-Extruir4 (cut)
    with SkipClean():  # the faces are left unmerged after this step: merging them gives an invalid solid
        with BuildSketch(Plane(origin=(-17.1, 0, 0), x_dir=(0, -1, 0), z_dir=(-1, 0, 0))):
            with Locations(Location((-5.5, 0, 0), (0, 0, 90))):
                Circle(CROQUIS63_R)
        extrude(amount=-CORTAR_EXTRUIR4_DEPTH, mode=Mode.SUBTRACT)

    # Croquis64 → Cortar-Extruir5 (cut)
    with SkipClean():  # the faces are left unmerged after this step: merging them gives an invalid solid
        with BuildSketch(Plane(origin=(-17.1, 0, 0), x_dir=(0, -1, 0), z_dir=(-1, 0, 0))):
            with Locations(Location((-5.5, 0, 0), (0, 0, 90))):
                Circle(CROQUIS64_R)
        extrude(amount=-CORTAR_EXTRUIR5_DEPTH, mode=Mode.SUBTRACT)

    # Croquis65 → Cortar-Extruir6 (cut)
    with SkipClean():  # the faces are left unmerged after this step: merging them gives an invalid solid
        with BuildSketch(Plane(origin=(0, 7.5, 0), x_dir=(1, 0, 0), z_dir=(0, 1, 0)).offset(CORTAR_EXTRUIR6_START)):
            with Locations((15.316758059, 0)):
                Rectangle(CROQUIS65_W, CROQUIS65_H)
        extrude(amount=CORTAR_EXTRUIR6_DEPTH, mode=Mode.SUBTRACT)


solid = part.part
